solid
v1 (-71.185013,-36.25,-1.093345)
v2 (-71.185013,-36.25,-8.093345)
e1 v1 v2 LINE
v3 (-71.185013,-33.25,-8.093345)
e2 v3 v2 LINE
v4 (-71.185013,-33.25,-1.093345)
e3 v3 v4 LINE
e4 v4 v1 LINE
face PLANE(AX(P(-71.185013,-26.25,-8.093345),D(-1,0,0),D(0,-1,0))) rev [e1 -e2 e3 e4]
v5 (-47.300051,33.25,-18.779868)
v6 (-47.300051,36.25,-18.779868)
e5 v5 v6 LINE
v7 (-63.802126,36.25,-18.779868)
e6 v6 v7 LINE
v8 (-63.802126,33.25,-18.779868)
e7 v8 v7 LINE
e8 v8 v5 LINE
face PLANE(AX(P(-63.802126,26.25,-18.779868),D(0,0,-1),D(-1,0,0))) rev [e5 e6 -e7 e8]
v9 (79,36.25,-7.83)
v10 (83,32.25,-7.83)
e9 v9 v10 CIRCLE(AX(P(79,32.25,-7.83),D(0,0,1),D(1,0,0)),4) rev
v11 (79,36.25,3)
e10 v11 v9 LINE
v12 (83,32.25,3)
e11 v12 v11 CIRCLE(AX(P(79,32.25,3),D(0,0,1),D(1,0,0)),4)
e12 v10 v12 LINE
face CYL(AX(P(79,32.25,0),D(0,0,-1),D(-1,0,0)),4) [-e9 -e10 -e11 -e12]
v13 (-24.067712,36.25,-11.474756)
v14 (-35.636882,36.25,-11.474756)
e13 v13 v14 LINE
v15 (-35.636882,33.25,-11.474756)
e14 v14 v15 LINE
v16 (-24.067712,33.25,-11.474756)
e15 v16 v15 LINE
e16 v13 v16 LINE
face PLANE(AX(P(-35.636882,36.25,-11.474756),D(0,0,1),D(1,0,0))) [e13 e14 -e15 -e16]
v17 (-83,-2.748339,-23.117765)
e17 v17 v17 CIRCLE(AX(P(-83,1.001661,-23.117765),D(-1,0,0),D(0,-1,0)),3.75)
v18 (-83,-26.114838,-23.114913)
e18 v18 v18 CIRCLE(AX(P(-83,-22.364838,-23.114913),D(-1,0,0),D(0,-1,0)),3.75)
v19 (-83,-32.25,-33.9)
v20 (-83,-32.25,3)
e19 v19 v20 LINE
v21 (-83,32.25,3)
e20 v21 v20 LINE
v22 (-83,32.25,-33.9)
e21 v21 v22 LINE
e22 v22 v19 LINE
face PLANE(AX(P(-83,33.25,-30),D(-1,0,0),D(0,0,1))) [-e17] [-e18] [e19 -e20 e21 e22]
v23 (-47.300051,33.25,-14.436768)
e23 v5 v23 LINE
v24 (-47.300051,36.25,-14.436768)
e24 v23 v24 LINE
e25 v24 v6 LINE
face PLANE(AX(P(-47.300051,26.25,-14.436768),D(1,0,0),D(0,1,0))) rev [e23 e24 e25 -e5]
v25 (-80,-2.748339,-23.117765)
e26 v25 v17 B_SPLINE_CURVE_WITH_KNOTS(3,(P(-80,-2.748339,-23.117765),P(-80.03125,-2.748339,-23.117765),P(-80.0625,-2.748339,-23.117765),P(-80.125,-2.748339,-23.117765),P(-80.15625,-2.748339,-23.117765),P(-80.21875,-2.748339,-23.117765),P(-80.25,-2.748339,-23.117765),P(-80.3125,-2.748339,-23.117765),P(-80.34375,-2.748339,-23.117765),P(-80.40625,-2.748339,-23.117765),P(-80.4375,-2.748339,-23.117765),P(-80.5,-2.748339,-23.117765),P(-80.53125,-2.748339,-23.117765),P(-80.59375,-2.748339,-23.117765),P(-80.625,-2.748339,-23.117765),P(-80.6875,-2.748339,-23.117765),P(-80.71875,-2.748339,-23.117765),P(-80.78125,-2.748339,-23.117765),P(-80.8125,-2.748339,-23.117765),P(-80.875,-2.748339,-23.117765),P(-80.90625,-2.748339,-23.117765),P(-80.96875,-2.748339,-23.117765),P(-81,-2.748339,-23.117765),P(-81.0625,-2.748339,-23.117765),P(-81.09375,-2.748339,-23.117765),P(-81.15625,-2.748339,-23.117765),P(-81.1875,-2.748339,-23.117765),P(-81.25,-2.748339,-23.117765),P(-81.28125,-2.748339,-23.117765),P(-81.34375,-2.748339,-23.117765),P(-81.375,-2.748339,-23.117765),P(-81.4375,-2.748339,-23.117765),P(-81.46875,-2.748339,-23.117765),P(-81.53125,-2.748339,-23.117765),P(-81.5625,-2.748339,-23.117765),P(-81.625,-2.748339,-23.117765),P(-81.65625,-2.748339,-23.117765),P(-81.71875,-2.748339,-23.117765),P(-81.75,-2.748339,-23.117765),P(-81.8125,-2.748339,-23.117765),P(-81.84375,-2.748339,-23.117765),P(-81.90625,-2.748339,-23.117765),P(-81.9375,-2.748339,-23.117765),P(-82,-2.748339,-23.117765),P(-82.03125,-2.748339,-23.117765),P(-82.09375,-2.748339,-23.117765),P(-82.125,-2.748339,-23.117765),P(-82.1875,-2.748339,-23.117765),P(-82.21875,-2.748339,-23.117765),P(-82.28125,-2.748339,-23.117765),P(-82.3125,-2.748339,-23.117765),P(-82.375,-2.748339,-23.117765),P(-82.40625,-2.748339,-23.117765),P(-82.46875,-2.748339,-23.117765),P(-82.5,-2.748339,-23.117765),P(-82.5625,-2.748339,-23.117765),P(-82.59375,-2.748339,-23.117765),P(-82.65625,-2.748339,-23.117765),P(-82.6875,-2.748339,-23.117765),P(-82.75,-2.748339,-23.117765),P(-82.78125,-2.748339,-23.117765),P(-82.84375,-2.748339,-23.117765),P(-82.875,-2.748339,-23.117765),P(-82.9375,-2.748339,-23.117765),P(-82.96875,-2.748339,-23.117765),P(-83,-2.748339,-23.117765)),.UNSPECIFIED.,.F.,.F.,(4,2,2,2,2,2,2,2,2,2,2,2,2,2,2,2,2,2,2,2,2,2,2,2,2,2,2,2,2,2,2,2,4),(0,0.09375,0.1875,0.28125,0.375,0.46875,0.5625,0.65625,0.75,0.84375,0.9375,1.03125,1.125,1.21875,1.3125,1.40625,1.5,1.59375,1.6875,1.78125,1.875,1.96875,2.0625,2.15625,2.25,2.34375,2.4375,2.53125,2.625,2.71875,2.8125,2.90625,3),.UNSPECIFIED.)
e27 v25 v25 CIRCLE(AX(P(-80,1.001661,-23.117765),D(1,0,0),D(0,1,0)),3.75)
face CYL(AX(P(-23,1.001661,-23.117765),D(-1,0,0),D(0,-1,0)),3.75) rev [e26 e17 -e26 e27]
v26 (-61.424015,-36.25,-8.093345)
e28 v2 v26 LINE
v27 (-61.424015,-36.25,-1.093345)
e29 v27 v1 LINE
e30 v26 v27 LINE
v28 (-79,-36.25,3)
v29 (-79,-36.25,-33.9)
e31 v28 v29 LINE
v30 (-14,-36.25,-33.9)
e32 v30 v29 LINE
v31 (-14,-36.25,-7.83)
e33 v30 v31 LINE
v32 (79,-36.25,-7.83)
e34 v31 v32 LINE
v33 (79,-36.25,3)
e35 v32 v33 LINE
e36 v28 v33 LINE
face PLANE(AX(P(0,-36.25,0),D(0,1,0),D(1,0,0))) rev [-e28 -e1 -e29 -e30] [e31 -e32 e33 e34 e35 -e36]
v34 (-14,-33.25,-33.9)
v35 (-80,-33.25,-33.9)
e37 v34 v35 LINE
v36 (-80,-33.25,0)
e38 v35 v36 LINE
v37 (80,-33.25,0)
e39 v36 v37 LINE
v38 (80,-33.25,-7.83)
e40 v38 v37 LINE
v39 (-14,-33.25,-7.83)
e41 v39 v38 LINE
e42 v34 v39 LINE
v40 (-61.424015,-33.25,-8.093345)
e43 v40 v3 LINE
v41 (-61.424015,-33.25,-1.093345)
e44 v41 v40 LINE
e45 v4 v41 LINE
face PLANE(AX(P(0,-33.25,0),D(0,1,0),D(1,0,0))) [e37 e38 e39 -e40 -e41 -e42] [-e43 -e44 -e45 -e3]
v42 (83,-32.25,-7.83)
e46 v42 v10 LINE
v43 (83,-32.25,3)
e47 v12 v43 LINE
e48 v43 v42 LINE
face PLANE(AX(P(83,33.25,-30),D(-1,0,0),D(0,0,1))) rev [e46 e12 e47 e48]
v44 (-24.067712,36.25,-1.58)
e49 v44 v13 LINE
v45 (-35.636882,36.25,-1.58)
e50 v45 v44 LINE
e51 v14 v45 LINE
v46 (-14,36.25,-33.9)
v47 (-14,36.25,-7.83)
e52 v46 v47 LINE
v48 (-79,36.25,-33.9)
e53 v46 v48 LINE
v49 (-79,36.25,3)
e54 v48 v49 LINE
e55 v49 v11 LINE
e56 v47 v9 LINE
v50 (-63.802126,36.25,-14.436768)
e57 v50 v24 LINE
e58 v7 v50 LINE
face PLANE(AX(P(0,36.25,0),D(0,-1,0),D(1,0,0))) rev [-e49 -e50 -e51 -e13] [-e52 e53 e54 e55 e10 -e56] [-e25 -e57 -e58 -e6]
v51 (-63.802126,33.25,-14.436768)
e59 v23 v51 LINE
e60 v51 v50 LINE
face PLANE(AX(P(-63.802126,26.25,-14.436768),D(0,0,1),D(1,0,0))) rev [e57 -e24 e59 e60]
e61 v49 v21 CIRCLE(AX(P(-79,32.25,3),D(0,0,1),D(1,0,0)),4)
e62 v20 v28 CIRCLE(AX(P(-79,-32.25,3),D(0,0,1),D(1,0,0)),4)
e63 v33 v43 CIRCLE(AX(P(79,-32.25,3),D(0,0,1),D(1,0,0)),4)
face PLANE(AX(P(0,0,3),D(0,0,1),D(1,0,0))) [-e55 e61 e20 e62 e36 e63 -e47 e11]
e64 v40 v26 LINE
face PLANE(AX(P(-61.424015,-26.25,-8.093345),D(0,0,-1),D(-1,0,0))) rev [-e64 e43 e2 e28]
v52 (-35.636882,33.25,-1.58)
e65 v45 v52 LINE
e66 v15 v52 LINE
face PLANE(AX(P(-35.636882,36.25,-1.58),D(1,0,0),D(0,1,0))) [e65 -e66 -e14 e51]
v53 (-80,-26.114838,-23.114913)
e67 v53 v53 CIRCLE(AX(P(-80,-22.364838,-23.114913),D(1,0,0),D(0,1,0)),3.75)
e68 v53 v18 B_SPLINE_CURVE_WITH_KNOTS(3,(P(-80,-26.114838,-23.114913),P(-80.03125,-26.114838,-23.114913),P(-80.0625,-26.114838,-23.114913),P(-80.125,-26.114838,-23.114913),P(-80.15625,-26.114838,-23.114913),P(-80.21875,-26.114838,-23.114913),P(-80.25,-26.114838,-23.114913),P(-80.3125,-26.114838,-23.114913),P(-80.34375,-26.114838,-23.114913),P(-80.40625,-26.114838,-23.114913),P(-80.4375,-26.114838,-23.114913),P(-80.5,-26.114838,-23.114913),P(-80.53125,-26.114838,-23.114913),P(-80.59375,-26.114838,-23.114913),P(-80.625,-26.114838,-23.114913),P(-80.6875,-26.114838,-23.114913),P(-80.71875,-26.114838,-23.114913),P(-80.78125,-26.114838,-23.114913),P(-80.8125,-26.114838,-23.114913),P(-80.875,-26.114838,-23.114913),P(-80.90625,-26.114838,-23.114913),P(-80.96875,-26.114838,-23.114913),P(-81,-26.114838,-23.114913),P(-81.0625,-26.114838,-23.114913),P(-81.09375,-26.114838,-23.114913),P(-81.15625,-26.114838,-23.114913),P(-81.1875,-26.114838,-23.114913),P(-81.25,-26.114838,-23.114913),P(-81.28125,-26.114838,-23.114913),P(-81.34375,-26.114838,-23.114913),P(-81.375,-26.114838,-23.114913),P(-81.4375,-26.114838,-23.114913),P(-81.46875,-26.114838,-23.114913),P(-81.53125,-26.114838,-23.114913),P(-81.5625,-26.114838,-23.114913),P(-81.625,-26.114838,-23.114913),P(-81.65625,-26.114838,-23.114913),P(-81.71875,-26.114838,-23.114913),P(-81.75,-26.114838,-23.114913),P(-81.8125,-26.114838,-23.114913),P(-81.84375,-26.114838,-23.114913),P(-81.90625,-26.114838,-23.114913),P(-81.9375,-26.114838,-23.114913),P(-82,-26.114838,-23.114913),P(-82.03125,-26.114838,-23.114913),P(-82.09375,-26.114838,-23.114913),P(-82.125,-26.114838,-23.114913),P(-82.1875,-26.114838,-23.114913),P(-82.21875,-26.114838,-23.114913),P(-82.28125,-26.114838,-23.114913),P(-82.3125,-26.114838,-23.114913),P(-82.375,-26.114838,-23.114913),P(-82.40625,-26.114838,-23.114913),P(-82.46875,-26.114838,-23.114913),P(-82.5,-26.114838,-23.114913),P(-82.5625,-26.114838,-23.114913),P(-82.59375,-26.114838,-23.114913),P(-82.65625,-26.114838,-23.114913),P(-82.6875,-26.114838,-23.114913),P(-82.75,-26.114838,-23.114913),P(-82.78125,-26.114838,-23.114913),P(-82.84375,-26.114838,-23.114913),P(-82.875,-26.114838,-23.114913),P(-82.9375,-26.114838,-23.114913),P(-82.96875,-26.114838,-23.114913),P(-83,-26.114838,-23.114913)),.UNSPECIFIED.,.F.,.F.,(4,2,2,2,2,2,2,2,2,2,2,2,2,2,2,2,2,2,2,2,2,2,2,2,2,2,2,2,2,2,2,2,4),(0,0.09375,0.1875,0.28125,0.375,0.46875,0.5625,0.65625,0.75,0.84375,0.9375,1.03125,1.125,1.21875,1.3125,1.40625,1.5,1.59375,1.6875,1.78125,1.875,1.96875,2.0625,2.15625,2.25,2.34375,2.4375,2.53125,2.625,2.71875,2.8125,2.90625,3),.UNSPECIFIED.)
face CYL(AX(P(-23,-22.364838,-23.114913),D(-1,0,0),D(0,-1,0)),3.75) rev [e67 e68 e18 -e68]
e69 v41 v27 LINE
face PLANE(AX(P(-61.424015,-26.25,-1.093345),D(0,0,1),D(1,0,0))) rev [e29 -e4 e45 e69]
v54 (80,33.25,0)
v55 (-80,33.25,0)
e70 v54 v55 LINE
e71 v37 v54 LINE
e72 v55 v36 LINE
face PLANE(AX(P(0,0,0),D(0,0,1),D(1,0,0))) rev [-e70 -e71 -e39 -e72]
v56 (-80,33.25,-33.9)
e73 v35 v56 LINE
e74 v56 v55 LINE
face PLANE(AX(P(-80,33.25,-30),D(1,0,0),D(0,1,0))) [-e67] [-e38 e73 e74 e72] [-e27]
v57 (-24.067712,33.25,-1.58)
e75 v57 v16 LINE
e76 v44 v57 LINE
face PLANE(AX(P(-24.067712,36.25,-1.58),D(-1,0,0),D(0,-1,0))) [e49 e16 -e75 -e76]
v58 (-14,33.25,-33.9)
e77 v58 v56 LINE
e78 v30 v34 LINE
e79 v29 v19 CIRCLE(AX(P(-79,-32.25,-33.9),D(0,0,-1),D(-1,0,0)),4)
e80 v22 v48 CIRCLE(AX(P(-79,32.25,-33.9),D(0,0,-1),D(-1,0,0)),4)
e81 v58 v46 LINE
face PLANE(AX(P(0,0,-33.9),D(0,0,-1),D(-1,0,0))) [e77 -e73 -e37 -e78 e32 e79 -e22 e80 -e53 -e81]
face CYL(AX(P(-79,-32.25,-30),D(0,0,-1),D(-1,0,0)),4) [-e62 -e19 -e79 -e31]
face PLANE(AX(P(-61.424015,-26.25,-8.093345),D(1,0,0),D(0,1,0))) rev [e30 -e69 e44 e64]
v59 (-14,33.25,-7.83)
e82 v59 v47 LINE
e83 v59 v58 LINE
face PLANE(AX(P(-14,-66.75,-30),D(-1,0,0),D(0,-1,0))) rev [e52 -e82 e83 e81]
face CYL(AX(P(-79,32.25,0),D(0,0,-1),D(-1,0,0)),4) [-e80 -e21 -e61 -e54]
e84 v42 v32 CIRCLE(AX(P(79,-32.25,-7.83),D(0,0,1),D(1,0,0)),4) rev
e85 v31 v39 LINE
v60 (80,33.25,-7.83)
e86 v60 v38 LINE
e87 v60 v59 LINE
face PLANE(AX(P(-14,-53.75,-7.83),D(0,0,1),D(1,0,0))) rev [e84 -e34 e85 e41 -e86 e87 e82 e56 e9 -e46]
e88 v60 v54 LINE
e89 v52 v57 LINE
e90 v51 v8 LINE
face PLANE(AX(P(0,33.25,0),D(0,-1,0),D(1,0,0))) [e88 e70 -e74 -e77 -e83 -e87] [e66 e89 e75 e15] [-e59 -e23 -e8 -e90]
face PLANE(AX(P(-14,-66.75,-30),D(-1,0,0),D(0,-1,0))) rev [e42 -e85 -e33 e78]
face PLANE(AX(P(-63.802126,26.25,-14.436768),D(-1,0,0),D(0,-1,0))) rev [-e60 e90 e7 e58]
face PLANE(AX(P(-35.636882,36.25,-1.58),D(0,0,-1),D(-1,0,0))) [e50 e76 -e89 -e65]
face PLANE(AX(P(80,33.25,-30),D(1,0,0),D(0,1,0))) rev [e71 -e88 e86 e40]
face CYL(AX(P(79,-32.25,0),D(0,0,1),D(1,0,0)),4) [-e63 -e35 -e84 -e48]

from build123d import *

# Parameters (mm, degrees)
ESQUISSE1_W                  = 160
ESQUISSE1_H                  = 66.5
BOSS_EXTRU_1_DEPTH           = 3
ESQUISSE3_W                  = 3
ESQUISSE3_H                  = 70.75
BOSS_EXTRU_2_DEPTH           = 33
ESQUISSE5_W                  = 166
ESQUISSE5_H                  = 33
ESQUISSE5_W_2                = 11.569169734
ESQUISSE5_H_2                = 9.894756015
BOSS_EXTRU_3_DEPTH           = 3
ENL_V_MAT_EXTRU_1_DEPTH      = 500
ENL_V_MAT_EXTRU_1_DEPTH_BACK = 13
ESQUISSE6_W                  = 33
ESQUISSE6_H                  = 1.25
CONG_2_R                     = 4
ESQUISSE7_W                  = 98.078954594
ESQUISSE7_H                  = 17.67
ENL_V_MAT_EXTRU_2_DEPTH      = 103
ESQUISSE8_R                  = 3.75
ENL_V_MAT_EXTRU_3_DEPTH      = 60
ESQUISSE9_W                  = 103.919717687
ESQUISSE9_H                  = 4.5
ENL_V_MAT_EXTRU_4_DEPTH      = 90
ESQUISSE11_W                 = 11.569169734
ESQUISSE11_H                 = 9.894756015
BOSS_EXTRU_4_DEPTH           = 3
D_PLACER_START               = -33.9
D_PLACER_LA_FACE2_DEPTH      = 3.9
ESQUISSE13_W                 = 16.502074088
ESQUISSE13_H                 = 4.3431
ENL_V_MAT_EXTRU_5_DEPTH      = 10
ESQUISSE15_W                 = 9.760998185
ESQUISSE15_H                 = 7
ENL_V_MAT_EXTRU_6_DEPTH      = 10


# Read off the part's stored shape, not the designer's step: Déplacer la face2
with BuildPart() as part:
    # Esquisse1 → Boss.-Extru.1 (new body)
    with BuildSketch(Plane.XY):
        Rectangle(ESQUISSE1_W, ESQUISSE1_H)
    extrude(amount=BOSS_EXTRU_1_DEPTH)

    # Esquisse3 → Boss.-Extru.2 (add)
    with BuildSketch(Plane.XY.offset(3)):
        with Locations((-81.5, -2.125)):
            Rectangle(ESQUISSE3_W, ESQUISSE3_H)
    boss_extru_2 = extrude(amount=-BOSS_EXTRU_2_DEPTH)

    # Symétrie1: Boss.-Extru.2 across plane
    add(boss_extru_2.mirror(Plane(origin=(0, 0, 0), x_dir=(0, 0, 1), z_dir=(1, 0, 0))))

    # Esquisse5 → Boss.-Extru.3 (add)
    with BuildSketch(Plane(origin=(0, 33.25, 0), x_dir=(1, 0, 0), z_dir=(0, 1, 0))):
        with Locations((0, 13.5)):
            Rectangle(ESQUISSE5_W, ESQUISSE5_H)
        with Locations((-29.852297111, 6.527378008)):
            Rectangle(ESQUISSE5_W_2, ESQUISSE5_H_2, mode=Mode.SUBTRACT)
    boss_extru_3 = extrude(amount=BOSS_EXTRU_3_DEPTH)

    # Symétrie2: Boss.-Extru.3 across plane
    add(boss_extru_3.mirror(Plane(origin=(0, 0, 0), x_dir=(0, 0, 1), z_dir=(0, -1, 0))))

    # Esquisse6 → Enlèv. mat.-Extru.1 (cut, two sides: drawn at the far end of the back side and taken through both)
    with BuildSketch(Plane.ZY.offset(-80).offset(-ENL_V_MAT_EXTRU_1_DEPTH_BACK)):
        with Locations((-13.5, -36.875)):
            Rectangle(ESQUISSE6_W, ESQUISSE6_H)
    extrude(amount=ENL_V_MAT_EXTRU_1_DEPTH + ENL_V_MAT_EXTRU_1_DEPTH_BACK, mode=Mode.SUBTRACT)

    # Congé2
    cong_2_edges = [part.edges().sort_by_distance(p)[0] for p in [
        (-83, -36.25, -13.5),
        (83, -36.25, -13.5),
        (-83, 36.25, -13.5),
        (83, 36.25, -13.5),
    ]]
    fillet(cong_2_edges, radius=CONG_2_R)

    # Esquisse7 → Enlèv. mat.-Extru.2 (cut)
    with BuildSketch(Plane(origin=(0, 36.25, 0), x_dir=(1, 0, 0), z_dir=(0, 1, 0))):
        with Locations((35.039477297, 21.165)):
            Rectangle(ESQUISSE7_W, ESQUISSE7_H)
    extrude(amount=-ENL_V_MAT_EXTRU_2_DEPTH, mode=Mode.SUBTRACT)

    # Esquisse8 → Enlèv. mat.-Extru.3 (cut)
    with BuildSketch(Plane.ZY.offset(83)):
        with Locations(Location((-23.114912873, -22.364838355, 0), (0, 0, 270))):
            Circle(ESQUISSE8_R)
        with Locations(Location((-23.117764577, 1.001660884, 0), (0, 0, 270))):
            Circle(ESQUISSE8_R)
    extrude(amount=-ENL_V_MAT_EXTRU_3_DEPTH, mode=Mode.SUBTRACT)

    # Esquisse9 → Enlèv. mat.-Extru.4 (cut)
    with BuildSketch(Plane(origin=(0, 36.25, 0), x_dir=(1, 0, 0), z_dir=(0, 1, 0))):
        with Locations((37.959858844, 10.08)):
            Rectangle(ESQUISSE9_W, ESQUISSE9_H)
    extrude(amount=-ENL_V_MAT_EXTRU_4_DEPTH, mode=Mode.SUBTRACT)

    # Esquisse11 → Boss.-Extru.4 (add)
    with BuildSketch(Plane.XZ.offset(36.25)):
        with Locations((-29.852297111, -6.527378008)):
            Rectangle(ESQUISSE11_W, ESQUISSE11_H)
    extrude(amount=-BOSS_EXTRU_4_DEPTH)

    # Déplacer la face2 outline → Déplacer la face2 (add)
    with BuildSketch(Plane.XY.offset(D_PLACER_START)):
        with BuildLine():
            ThreePointArc((-79, 36.25), (-81.828427125, 35.078427125), (-83, 32.25))
            Line((-83, 32.25), (-83, -32.25))
            ThreePointArc((-83, -32.25), (-81.828427125, -35.078427125), (-79, -36.25))
            Line((-79, -36.25), (-14, -36.25))
            Line((-14, -36.25), (-14, -33.25))
            Line((-14, -33.25), (-80, -33.25))
            Line((-80, -33.25), (-80, 33.25))
            Line((-80, 33.25), (-14, 33.25))
            Line((-14, 33.25), (-14, 36.25))
            Line((-14, 36.25), (-79, 36.25))
        make_face()
    extrude(amount=D_PLACER_LA_FACE2_DEPTH)

    # Esquisse13 → Enlèv. mat.-Extru.5 (cut)
    with BuildSketch(Plane(origin=(0, 36.25, 0), x_dir=(1, 0, 0), z_dir=(0, 1, 0))):
        with Locations((-55.551088515, 16.608317679)):
            Rectangle(ESQUISSE13_W, ESQUISSE13_H)
    extrude(amount=-ENL_V_MAT_EXTRU_5_DEPTH, mode=Mode.SUBTRACT)

    # Esquisse15 → Enlèv. mat.-Extru.6 (cut)
    with BuildSketch(Plane.XZ.offset(36.25)):
        with Locations((-66.304513779, -4.593344901)):
            Rectangle(ESQUISSE15_W, ESQUISSE15_H)
    extrude(amount=-ENL_V_MAT_EXTRU_6_DEPTH, mode=Mode.SUBTRACT)


solid = part.part
